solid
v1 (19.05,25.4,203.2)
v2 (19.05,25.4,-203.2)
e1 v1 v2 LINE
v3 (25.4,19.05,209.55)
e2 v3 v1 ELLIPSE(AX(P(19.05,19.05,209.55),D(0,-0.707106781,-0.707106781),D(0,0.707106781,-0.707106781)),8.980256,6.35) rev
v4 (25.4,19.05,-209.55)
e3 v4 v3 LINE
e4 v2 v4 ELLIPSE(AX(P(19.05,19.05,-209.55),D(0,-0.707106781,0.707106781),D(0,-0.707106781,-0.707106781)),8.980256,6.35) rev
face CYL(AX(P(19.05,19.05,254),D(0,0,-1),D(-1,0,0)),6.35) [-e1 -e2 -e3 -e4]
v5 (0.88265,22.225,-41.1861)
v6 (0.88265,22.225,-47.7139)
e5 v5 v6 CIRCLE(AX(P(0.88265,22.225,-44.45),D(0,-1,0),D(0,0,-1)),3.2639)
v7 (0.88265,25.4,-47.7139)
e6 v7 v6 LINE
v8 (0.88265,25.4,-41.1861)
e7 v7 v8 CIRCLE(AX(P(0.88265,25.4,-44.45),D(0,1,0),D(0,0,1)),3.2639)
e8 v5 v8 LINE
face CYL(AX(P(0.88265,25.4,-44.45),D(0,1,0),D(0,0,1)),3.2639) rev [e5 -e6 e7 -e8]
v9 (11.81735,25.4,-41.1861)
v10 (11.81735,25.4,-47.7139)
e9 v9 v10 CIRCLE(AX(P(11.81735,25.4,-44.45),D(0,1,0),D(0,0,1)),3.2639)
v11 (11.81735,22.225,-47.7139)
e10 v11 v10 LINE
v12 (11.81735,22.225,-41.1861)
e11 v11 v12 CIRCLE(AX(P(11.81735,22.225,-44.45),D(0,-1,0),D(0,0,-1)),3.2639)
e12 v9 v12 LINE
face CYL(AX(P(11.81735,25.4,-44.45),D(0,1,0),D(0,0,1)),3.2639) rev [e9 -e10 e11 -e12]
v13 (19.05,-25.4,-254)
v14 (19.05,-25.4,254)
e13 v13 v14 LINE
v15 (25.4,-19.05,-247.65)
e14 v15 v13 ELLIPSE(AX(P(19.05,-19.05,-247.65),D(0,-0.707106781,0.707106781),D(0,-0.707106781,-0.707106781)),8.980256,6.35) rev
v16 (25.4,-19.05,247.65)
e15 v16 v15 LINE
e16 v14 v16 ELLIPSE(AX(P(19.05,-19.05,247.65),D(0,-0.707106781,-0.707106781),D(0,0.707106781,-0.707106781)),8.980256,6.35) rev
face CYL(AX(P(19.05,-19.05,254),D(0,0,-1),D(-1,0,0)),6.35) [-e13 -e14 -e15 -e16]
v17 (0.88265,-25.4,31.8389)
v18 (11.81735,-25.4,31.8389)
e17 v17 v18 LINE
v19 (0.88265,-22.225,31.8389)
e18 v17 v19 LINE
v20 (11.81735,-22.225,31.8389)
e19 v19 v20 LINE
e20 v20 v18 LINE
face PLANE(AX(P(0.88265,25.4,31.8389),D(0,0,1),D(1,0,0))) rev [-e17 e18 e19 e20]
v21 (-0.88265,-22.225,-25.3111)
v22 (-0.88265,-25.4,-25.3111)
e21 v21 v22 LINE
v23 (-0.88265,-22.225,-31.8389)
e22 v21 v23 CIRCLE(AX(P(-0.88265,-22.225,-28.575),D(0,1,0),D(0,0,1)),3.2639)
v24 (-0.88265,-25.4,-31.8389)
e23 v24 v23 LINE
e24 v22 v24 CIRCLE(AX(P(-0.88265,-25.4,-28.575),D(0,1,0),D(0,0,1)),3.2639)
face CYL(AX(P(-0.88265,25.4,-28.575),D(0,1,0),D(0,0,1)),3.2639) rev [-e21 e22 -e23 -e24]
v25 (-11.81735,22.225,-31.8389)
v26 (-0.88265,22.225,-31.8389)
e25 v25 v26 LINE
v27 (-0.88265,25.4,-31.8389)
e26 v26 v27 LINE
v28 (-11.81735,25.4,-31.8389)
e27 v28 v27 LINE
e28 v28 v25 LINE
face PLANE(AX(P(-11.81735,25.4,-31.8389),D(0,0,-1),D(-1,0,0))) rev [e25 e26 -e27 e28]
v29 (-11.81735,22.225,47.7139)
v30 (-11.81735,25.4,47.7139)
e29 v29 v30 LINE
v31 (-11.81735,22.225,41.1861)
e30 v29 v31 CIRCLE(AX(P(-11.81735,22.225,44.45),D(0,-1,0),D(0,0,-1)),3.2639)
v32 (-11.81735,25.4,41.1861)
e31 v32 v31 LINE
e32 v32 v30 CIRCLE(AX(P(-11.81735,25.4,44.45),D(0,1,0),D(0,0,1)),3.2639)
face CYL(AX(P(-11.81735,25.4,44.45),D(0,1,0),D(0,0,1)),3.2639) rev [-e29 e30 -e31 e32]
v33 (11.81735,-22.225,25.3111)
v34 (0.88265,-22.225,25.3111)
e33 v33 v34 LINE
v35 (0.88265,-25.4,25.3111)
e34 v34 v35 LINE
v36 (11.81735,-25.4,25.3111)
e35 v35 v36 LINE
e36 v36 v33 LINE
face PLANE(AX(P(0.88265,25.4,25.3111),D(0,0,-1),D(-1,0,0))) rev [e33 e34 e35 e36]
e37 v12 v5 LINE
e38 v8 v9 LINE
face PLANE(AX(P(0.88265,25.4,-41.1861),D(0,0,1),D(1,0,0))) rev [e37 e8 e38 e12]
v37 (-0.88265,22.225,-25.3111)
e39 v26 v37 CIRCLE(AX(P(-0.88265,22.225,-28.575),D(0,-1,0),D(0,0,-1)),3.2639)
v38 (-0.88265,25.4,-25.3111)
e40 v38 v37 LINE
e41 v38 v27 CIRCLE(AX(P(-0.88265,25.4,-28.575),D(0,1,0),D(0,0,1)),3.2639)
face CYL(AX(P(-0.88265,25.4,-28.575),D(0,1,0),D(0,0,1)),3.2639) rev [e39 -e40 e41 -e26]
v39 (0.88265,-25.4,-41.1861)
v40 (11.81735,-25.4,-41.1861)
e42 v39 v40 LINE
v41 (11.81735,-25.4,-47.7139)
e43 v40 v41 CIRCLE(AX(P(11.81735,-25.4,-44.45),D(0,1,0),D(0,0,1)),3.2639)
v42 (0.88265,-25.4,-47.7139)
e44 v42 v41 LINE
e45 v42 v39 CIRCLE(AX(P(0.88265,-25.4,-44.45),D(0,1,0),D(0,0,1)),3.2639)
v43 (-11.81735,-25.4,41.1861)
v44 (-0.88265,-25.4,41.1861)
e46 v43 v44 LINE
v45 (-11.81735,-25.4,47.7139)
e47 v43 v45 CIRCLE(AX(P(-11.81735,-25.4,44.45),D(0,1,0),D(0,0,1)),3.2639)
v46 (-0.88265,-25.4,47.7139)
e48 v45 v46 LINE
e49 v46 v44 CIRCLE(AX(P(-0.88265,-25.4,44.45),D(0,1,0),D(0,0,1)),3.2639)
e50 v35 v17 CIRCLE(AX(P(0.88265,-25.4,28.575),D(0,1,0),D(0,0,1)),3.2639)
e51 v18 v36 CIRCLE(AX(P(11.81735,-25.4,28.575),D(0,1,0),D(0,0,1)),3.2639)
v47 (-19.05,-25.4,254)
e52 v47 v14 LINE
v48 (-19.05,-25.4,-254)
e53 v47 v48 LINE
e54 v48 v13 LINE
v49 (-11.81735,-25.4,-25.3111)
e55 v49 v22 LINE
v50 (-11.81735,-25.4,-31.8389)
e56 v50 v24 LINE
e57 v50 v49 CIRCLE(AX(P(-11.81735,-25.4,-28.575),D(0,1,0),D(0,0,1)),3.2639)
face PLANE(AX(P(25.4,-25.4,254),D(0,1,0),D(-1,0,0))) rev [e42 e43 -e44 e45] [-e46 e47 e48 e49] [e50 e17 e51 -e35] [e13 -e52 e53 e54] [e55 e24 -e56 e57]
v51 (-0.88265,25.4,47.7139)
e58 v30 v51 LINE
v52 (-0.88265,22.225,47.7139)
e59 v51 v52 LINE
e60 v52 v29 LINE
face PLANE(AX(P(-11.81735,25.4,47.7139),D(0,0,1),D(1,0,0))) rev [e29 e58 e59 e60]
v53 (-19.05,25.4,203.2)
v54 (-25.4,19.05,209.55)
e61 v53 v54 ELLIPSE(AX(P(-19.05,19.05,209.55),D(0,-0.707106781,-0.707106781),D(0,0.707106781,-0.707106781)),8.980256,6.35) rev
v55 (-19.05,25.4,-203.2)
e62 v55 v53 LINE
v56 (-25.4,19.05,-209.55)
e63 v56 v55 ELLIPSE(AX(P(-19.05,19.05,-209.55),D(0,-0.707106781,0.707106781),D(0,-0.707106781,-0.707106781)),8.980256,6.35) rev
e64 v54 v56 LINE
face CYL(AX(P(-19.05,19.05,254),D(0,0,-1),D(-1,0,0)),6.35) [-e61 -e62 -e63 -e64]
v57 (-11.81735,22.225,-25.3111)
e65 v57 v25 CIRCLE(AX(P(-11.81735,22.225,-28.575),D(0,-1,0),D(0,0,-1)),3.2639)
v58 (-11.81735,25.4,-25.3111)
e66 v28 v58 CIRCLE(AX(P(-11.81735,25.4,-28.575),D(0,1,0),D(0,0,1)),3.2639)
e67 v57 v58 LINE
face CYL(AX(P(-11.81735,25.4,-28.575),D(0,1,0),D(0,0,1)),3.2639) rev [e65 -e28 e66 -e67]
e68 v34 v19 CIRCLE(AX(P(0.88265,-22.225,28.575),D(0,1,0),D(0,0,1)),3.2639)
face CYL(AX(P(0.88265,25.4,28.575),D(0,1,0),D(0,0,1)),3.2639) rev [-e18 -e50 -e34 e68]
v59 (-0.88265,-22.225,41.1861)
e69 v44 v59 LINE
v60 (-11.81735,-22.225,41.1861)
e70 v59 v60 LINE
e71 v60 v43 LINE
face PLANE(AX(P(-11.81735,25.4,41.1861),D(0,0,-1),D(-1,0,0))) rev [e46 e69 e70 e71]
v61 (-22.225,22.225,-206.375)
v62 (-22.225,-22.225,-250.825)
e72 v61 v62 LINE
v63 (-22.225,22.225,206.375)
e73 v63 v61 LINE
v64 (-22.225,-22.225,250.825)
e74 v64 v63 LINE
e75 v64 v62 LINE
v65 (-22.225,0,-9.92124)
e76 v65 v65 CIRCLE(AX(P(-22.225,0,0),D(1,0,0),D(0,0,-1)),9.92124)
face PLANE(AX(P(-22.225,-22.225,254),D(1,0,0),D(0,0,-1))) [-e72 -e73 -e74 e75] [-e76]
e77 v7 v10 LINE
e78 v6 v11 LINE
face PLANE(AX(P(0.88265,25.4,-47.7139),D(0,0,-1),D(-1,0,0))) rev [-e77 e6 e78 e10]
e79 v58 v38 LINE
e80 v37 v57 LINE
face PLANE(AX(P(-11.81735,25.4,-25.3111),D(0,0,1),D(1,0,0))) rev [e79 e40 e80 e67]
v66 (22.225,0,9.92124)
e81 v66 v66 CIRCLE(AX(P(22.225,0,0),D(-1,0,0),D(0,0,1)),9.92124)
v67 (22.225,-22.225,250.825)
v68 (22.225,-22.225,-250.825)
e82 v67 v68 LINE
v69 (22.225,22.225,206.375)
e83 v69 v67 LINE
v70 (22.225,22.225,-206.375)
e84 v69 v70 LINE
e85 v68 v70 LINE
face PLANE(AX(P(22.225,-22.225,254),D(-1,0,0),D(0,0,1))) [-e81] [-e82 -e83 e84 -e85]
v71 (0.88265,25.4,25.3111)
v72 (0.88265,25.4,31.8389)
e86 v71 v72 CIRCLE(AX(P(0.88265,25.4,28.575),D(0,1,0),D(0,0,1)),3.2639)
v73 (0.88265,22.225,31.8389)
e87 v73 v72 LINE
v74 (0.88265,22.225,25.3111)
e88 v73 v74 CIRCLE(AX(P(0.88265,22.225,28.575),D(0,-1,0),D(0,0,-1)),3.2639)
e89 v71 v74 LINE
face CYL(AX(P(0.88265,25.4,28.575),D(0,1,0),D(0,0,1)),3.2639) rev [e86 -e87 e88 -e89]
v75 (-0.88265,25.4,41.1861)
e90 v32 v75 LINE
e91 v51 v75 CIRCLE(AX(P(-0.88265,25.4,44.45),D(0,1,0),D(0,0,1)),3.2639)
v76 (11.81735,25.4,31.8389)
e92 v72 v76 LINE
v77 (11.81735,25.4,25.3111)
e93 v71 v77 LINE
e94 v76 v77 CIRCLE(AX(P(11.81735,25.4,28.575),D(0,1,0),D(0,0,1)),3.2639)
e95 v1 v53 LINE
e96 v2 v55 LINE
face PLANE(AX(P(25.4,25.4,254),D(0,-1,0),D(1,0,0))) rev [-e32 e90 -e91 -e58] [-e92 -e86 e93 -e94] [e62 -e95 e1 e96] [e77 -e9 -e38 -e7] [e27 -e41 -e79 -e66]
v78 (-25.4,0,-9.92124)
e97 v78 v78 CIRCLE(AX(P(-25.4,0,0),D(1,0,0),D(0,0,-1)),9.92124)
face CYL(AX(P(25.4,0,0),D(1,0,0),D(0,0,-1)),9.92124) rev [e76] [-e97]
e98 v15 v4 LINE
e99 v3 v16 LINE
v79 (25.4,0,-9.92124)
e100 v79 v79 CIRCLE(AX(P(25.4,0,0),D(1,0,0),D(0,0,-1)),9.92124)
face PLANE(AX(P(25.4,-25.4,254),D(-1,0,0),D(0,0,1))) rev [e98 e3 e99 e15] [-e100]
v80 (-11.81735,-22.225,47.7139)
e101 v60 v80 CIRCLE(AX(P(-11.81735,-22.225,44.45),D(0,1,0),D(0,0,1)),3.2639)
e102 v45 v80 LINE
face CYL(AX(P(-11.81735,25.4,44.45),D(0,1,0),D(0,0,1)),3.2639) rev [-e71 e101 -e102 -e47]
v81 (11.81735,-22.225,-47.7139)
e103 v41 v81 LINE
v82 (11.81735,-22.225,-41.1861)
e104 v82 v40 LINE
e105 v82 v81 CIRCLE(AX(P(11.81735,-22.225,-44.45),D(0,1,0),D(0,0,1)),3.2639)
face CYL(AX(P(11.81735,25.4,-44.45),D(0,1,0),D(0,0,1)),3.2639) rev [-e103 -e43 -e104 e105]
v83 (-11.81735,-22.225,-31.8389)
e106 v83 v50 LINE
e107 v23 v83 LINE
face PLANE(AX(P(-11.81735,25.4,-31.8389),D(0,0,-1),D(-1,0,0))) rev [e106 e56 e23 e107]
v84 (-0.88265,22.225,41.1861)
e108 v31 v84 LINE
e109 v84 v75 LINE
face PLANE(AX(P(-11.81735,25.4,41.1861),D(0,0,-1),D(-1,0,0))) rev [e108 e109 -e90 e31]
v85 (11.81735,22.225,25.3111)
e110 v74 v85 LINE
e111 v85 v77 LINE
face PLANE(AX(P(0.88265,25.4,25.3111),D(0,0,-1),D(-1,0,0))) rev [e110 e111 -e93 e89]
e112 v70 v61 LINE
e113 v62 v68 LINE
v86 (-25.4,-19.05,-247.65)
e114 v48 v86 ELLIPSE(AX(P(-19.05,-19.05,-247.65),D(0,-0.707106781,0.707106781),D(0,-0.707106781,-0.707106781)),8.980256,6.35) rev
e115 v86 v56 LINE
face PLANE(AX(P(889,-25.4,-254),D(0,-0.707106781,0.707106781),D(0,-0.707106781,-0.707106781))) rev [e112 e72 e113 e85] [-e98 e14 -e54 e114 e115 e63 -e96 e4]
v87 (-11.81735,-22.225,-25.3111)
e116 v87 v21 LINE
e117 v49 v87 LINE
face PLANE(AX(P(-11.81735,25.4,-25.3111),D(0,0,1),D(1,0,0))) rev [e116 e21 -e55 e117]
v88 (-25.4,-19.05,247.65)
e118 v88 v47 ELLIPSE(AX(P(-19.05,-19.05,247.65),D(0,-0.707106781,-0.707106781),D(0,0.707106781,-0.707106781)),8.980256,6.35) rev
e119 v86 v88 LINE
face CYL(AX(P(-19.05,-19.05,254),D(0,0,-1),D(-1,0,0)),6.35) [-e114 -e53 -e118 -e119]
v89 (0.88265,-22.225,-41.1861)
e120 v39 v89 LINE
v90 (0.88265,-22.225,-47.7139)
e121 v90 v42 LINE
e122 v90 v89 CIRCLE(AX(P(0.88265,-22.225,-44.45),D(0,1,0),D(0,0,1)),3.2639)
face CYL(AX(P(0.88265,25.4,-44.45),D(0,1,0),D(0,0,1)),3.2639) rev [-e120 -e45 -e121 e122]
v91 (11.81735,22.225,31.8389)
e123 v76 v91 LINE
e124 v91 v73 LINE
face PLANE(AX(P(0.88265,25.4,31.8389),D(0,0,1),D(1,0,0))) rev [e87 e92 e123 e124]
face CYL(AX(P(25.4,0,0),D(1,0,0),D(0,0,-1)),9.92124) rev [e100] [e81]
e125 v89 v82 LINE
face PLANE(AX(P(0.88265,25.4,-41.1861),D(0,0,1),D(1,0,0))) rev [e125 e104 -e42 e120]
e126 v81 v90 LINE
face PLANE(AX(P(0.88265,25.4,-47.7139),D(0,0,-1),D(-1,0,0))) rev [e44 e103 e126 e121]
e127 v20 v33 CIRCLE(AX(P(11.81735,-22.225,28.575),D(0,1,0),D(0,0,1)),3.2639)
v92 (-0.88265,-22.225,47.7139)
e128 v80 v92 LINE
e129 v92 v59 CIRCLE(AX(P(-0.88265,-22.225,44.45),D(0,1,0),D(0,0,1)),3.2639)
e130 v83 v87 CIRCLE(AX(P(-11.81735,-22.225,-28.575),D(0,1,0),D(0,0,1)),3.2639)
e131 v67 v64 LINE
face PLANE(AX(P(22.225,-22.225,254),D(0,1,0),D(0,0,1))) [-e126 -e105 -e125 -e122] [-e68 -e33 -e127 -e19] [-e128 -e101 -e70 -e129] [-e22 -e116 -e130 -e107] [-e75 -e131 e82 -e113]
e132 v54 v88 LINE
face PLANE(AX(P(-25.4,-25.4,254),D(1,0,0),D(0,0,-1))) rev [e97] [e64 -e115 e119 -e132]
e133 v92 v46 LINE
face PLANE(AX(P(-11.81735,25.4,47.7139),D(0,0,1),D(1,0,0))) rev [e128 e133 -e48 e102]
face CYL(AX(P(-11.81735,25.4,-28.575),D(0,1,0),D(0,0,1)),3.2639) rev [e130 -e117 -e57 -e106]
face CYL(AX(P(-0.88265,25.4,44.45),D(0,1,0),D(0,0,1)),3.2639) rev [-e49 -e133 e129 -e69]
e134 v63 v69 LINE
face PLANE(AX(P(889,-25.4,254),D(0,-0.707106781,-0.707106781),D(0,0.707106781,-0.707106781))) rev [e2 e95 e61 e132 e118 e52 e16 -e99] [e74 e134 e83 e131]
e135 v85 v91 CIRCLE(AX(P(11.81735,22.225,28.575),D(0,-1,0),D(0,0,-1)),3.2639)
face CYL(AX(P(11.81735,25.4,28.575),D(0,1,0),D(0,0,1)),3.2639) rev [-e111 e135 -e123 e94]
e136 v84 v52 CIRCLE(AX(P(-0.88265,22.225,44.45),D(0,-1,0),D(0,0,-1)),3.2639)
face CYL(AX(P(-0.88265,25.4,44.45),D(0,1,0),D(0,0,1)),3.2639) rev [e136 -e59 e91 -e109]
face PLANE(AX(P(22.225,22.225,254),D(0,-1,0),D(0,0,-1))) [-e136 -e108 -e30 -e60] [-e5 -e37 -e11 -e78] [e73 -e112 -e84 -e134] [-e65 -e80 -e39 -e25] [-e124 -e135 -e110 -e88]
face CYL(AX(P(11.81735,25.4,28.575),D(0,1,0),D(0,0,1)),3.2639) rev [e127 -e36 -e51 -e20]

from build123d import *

# Parameters (mm, degrees)
SKETCH1_W                   = 50.8
SKETCH1_H                   = 50.8
SKETCH1_W_2                 = 44.45
SKETCH1_H_2                 = 44.45
BOSS_EXTRUDE1_DEPTH         = 254
FILLET1_R                   = 6.35
CUT_EXTRUDE1_DEPTH          = 914.4
F_1_4_START                 = -25.4
F_1_4_CLEARANCE_SLOT1_DEPTH = 50.8
F_3_4_CLEARANCE_HOLE1_D     = 19.84248


# Read off the part's stored shape, not the designer's step: 1/4 Clearance Slot1
with BuildPart() as part:
    # Sketch1 → Boss-Extrude1 (new, symmetric)
    with BuildSketch(Plane.XY):
        Rectangle(SKETCH1_W, SKETCH1_H)
        Rectangle(SKETCH1_W_2, SKETCH1_H_2, mode=Mode.SUBTRACT)
    extrude(amount=BOSS_EXTRUDE1_DEPTH, both=True)

    # Fillet1
    fillet1_edges = [part.edges().sort_by_distance(p)[0] for p in [
        (-25.4, 25.4, 0),
        (25.4, 25.4, 0),
        (25.4, -25.4, 0),
        (-25.4, -25.4, 0),
    ]]
    fillet(fillet1_edges, radius=FILLET1_R)

    # Sketch2 → Cut-Extrude1 (cut)
    with BuildSketch(Plane.ZY.offset(25.4)):
        Polygon((254, -25.4), (203.2, 25.4), (254, 25.4), align=None)
        Polygon((-254, 25.4), (-254, -25.4), (-203.2, 25.4), align=None)
    extrude(amount=-CUT_EXTRUDE1_DEPTH, mode=Mode.SUBTRACT)

    # 1/4 Clearance Slot1 outline → 1/4 Clearance Slot1 (cut)
    with BuildSketch(Plane(origin=(0, 0, 0), x_dir=(1, 0, 0), z_dir=(0, 1, 0)).offset(F_1_4_START)):
        with BuildLine():
            ThreePointArc((-0.88265, -47.7139), (2.38125, -44.45), (-0.88265, -41.1861))
            Line((-0.88265, -41.1861), (-11.81735, -41.1861))
            ThreePointArc((-11.81735, -41.1861), (-15.08125, -44.45), (-11.81735, -47.7139))
            Line((-11.81735, -47.7139), (-0.88265, -47.7139))
        make_face()
        with BuildLine():
            ThreePointArc((11.81735, -31.8389), (15.08125, -28.575), (11.81735, -25.3111))
            Line((11.81735, -25.3111), (0.88265, -25.3111))
            ThreePointArc((0.88265, -25.3111), (-2.38125, -28.575), (0.88265, -31.8389))
            Line((0.88265, -31.8389), (11.81735, -31.8389))
        make_face()
        with BuildLine():
            ThreePointArc((-0.88265, 25.3111), (2.38125, 28.575), (-0.88265, 31.8389))
            Line((-0.88265, 31.8389), (-11.81735, 31.8389))
            ThreePointArc((-11.81735, 31.8389), (-15.08125, 28.575), (-11.81735, 25.3111))
            Line((-11.81735, 25.3111), (-0.88265, 25.3111))
        make_face()
        with BuildLine():
            Line((0.88265, 41.1861), (11.81735, 41.1861))
            ThreePointArc((11.81735, 41.1861), (15.08125, 44.45), (11.81735, 47.7139))
            Line((11.81735, 47.7139), (0.88265, 47.7139))
            ThreePointArc((0.88265, 47.7139), (-2.38125, 44.45), (0.88265, 41.1861))
        make_face()
    extrude(amount=F_1_4_CLEARANCE_SLOT1_DEPTH, mode=Mode.SUBTRACT)

    # 3/4 Clearance Hole1 (through all)
    with Locations(Plane(origin=(25.4, 0, 0), x_dir=(0, 0, -1), z_dir=(1, 0, 0))):
        with Locations((0, 0)):
            Hole(F_3_4_CLEARANCE_HOLE1_D / 2)


solid = part.part
